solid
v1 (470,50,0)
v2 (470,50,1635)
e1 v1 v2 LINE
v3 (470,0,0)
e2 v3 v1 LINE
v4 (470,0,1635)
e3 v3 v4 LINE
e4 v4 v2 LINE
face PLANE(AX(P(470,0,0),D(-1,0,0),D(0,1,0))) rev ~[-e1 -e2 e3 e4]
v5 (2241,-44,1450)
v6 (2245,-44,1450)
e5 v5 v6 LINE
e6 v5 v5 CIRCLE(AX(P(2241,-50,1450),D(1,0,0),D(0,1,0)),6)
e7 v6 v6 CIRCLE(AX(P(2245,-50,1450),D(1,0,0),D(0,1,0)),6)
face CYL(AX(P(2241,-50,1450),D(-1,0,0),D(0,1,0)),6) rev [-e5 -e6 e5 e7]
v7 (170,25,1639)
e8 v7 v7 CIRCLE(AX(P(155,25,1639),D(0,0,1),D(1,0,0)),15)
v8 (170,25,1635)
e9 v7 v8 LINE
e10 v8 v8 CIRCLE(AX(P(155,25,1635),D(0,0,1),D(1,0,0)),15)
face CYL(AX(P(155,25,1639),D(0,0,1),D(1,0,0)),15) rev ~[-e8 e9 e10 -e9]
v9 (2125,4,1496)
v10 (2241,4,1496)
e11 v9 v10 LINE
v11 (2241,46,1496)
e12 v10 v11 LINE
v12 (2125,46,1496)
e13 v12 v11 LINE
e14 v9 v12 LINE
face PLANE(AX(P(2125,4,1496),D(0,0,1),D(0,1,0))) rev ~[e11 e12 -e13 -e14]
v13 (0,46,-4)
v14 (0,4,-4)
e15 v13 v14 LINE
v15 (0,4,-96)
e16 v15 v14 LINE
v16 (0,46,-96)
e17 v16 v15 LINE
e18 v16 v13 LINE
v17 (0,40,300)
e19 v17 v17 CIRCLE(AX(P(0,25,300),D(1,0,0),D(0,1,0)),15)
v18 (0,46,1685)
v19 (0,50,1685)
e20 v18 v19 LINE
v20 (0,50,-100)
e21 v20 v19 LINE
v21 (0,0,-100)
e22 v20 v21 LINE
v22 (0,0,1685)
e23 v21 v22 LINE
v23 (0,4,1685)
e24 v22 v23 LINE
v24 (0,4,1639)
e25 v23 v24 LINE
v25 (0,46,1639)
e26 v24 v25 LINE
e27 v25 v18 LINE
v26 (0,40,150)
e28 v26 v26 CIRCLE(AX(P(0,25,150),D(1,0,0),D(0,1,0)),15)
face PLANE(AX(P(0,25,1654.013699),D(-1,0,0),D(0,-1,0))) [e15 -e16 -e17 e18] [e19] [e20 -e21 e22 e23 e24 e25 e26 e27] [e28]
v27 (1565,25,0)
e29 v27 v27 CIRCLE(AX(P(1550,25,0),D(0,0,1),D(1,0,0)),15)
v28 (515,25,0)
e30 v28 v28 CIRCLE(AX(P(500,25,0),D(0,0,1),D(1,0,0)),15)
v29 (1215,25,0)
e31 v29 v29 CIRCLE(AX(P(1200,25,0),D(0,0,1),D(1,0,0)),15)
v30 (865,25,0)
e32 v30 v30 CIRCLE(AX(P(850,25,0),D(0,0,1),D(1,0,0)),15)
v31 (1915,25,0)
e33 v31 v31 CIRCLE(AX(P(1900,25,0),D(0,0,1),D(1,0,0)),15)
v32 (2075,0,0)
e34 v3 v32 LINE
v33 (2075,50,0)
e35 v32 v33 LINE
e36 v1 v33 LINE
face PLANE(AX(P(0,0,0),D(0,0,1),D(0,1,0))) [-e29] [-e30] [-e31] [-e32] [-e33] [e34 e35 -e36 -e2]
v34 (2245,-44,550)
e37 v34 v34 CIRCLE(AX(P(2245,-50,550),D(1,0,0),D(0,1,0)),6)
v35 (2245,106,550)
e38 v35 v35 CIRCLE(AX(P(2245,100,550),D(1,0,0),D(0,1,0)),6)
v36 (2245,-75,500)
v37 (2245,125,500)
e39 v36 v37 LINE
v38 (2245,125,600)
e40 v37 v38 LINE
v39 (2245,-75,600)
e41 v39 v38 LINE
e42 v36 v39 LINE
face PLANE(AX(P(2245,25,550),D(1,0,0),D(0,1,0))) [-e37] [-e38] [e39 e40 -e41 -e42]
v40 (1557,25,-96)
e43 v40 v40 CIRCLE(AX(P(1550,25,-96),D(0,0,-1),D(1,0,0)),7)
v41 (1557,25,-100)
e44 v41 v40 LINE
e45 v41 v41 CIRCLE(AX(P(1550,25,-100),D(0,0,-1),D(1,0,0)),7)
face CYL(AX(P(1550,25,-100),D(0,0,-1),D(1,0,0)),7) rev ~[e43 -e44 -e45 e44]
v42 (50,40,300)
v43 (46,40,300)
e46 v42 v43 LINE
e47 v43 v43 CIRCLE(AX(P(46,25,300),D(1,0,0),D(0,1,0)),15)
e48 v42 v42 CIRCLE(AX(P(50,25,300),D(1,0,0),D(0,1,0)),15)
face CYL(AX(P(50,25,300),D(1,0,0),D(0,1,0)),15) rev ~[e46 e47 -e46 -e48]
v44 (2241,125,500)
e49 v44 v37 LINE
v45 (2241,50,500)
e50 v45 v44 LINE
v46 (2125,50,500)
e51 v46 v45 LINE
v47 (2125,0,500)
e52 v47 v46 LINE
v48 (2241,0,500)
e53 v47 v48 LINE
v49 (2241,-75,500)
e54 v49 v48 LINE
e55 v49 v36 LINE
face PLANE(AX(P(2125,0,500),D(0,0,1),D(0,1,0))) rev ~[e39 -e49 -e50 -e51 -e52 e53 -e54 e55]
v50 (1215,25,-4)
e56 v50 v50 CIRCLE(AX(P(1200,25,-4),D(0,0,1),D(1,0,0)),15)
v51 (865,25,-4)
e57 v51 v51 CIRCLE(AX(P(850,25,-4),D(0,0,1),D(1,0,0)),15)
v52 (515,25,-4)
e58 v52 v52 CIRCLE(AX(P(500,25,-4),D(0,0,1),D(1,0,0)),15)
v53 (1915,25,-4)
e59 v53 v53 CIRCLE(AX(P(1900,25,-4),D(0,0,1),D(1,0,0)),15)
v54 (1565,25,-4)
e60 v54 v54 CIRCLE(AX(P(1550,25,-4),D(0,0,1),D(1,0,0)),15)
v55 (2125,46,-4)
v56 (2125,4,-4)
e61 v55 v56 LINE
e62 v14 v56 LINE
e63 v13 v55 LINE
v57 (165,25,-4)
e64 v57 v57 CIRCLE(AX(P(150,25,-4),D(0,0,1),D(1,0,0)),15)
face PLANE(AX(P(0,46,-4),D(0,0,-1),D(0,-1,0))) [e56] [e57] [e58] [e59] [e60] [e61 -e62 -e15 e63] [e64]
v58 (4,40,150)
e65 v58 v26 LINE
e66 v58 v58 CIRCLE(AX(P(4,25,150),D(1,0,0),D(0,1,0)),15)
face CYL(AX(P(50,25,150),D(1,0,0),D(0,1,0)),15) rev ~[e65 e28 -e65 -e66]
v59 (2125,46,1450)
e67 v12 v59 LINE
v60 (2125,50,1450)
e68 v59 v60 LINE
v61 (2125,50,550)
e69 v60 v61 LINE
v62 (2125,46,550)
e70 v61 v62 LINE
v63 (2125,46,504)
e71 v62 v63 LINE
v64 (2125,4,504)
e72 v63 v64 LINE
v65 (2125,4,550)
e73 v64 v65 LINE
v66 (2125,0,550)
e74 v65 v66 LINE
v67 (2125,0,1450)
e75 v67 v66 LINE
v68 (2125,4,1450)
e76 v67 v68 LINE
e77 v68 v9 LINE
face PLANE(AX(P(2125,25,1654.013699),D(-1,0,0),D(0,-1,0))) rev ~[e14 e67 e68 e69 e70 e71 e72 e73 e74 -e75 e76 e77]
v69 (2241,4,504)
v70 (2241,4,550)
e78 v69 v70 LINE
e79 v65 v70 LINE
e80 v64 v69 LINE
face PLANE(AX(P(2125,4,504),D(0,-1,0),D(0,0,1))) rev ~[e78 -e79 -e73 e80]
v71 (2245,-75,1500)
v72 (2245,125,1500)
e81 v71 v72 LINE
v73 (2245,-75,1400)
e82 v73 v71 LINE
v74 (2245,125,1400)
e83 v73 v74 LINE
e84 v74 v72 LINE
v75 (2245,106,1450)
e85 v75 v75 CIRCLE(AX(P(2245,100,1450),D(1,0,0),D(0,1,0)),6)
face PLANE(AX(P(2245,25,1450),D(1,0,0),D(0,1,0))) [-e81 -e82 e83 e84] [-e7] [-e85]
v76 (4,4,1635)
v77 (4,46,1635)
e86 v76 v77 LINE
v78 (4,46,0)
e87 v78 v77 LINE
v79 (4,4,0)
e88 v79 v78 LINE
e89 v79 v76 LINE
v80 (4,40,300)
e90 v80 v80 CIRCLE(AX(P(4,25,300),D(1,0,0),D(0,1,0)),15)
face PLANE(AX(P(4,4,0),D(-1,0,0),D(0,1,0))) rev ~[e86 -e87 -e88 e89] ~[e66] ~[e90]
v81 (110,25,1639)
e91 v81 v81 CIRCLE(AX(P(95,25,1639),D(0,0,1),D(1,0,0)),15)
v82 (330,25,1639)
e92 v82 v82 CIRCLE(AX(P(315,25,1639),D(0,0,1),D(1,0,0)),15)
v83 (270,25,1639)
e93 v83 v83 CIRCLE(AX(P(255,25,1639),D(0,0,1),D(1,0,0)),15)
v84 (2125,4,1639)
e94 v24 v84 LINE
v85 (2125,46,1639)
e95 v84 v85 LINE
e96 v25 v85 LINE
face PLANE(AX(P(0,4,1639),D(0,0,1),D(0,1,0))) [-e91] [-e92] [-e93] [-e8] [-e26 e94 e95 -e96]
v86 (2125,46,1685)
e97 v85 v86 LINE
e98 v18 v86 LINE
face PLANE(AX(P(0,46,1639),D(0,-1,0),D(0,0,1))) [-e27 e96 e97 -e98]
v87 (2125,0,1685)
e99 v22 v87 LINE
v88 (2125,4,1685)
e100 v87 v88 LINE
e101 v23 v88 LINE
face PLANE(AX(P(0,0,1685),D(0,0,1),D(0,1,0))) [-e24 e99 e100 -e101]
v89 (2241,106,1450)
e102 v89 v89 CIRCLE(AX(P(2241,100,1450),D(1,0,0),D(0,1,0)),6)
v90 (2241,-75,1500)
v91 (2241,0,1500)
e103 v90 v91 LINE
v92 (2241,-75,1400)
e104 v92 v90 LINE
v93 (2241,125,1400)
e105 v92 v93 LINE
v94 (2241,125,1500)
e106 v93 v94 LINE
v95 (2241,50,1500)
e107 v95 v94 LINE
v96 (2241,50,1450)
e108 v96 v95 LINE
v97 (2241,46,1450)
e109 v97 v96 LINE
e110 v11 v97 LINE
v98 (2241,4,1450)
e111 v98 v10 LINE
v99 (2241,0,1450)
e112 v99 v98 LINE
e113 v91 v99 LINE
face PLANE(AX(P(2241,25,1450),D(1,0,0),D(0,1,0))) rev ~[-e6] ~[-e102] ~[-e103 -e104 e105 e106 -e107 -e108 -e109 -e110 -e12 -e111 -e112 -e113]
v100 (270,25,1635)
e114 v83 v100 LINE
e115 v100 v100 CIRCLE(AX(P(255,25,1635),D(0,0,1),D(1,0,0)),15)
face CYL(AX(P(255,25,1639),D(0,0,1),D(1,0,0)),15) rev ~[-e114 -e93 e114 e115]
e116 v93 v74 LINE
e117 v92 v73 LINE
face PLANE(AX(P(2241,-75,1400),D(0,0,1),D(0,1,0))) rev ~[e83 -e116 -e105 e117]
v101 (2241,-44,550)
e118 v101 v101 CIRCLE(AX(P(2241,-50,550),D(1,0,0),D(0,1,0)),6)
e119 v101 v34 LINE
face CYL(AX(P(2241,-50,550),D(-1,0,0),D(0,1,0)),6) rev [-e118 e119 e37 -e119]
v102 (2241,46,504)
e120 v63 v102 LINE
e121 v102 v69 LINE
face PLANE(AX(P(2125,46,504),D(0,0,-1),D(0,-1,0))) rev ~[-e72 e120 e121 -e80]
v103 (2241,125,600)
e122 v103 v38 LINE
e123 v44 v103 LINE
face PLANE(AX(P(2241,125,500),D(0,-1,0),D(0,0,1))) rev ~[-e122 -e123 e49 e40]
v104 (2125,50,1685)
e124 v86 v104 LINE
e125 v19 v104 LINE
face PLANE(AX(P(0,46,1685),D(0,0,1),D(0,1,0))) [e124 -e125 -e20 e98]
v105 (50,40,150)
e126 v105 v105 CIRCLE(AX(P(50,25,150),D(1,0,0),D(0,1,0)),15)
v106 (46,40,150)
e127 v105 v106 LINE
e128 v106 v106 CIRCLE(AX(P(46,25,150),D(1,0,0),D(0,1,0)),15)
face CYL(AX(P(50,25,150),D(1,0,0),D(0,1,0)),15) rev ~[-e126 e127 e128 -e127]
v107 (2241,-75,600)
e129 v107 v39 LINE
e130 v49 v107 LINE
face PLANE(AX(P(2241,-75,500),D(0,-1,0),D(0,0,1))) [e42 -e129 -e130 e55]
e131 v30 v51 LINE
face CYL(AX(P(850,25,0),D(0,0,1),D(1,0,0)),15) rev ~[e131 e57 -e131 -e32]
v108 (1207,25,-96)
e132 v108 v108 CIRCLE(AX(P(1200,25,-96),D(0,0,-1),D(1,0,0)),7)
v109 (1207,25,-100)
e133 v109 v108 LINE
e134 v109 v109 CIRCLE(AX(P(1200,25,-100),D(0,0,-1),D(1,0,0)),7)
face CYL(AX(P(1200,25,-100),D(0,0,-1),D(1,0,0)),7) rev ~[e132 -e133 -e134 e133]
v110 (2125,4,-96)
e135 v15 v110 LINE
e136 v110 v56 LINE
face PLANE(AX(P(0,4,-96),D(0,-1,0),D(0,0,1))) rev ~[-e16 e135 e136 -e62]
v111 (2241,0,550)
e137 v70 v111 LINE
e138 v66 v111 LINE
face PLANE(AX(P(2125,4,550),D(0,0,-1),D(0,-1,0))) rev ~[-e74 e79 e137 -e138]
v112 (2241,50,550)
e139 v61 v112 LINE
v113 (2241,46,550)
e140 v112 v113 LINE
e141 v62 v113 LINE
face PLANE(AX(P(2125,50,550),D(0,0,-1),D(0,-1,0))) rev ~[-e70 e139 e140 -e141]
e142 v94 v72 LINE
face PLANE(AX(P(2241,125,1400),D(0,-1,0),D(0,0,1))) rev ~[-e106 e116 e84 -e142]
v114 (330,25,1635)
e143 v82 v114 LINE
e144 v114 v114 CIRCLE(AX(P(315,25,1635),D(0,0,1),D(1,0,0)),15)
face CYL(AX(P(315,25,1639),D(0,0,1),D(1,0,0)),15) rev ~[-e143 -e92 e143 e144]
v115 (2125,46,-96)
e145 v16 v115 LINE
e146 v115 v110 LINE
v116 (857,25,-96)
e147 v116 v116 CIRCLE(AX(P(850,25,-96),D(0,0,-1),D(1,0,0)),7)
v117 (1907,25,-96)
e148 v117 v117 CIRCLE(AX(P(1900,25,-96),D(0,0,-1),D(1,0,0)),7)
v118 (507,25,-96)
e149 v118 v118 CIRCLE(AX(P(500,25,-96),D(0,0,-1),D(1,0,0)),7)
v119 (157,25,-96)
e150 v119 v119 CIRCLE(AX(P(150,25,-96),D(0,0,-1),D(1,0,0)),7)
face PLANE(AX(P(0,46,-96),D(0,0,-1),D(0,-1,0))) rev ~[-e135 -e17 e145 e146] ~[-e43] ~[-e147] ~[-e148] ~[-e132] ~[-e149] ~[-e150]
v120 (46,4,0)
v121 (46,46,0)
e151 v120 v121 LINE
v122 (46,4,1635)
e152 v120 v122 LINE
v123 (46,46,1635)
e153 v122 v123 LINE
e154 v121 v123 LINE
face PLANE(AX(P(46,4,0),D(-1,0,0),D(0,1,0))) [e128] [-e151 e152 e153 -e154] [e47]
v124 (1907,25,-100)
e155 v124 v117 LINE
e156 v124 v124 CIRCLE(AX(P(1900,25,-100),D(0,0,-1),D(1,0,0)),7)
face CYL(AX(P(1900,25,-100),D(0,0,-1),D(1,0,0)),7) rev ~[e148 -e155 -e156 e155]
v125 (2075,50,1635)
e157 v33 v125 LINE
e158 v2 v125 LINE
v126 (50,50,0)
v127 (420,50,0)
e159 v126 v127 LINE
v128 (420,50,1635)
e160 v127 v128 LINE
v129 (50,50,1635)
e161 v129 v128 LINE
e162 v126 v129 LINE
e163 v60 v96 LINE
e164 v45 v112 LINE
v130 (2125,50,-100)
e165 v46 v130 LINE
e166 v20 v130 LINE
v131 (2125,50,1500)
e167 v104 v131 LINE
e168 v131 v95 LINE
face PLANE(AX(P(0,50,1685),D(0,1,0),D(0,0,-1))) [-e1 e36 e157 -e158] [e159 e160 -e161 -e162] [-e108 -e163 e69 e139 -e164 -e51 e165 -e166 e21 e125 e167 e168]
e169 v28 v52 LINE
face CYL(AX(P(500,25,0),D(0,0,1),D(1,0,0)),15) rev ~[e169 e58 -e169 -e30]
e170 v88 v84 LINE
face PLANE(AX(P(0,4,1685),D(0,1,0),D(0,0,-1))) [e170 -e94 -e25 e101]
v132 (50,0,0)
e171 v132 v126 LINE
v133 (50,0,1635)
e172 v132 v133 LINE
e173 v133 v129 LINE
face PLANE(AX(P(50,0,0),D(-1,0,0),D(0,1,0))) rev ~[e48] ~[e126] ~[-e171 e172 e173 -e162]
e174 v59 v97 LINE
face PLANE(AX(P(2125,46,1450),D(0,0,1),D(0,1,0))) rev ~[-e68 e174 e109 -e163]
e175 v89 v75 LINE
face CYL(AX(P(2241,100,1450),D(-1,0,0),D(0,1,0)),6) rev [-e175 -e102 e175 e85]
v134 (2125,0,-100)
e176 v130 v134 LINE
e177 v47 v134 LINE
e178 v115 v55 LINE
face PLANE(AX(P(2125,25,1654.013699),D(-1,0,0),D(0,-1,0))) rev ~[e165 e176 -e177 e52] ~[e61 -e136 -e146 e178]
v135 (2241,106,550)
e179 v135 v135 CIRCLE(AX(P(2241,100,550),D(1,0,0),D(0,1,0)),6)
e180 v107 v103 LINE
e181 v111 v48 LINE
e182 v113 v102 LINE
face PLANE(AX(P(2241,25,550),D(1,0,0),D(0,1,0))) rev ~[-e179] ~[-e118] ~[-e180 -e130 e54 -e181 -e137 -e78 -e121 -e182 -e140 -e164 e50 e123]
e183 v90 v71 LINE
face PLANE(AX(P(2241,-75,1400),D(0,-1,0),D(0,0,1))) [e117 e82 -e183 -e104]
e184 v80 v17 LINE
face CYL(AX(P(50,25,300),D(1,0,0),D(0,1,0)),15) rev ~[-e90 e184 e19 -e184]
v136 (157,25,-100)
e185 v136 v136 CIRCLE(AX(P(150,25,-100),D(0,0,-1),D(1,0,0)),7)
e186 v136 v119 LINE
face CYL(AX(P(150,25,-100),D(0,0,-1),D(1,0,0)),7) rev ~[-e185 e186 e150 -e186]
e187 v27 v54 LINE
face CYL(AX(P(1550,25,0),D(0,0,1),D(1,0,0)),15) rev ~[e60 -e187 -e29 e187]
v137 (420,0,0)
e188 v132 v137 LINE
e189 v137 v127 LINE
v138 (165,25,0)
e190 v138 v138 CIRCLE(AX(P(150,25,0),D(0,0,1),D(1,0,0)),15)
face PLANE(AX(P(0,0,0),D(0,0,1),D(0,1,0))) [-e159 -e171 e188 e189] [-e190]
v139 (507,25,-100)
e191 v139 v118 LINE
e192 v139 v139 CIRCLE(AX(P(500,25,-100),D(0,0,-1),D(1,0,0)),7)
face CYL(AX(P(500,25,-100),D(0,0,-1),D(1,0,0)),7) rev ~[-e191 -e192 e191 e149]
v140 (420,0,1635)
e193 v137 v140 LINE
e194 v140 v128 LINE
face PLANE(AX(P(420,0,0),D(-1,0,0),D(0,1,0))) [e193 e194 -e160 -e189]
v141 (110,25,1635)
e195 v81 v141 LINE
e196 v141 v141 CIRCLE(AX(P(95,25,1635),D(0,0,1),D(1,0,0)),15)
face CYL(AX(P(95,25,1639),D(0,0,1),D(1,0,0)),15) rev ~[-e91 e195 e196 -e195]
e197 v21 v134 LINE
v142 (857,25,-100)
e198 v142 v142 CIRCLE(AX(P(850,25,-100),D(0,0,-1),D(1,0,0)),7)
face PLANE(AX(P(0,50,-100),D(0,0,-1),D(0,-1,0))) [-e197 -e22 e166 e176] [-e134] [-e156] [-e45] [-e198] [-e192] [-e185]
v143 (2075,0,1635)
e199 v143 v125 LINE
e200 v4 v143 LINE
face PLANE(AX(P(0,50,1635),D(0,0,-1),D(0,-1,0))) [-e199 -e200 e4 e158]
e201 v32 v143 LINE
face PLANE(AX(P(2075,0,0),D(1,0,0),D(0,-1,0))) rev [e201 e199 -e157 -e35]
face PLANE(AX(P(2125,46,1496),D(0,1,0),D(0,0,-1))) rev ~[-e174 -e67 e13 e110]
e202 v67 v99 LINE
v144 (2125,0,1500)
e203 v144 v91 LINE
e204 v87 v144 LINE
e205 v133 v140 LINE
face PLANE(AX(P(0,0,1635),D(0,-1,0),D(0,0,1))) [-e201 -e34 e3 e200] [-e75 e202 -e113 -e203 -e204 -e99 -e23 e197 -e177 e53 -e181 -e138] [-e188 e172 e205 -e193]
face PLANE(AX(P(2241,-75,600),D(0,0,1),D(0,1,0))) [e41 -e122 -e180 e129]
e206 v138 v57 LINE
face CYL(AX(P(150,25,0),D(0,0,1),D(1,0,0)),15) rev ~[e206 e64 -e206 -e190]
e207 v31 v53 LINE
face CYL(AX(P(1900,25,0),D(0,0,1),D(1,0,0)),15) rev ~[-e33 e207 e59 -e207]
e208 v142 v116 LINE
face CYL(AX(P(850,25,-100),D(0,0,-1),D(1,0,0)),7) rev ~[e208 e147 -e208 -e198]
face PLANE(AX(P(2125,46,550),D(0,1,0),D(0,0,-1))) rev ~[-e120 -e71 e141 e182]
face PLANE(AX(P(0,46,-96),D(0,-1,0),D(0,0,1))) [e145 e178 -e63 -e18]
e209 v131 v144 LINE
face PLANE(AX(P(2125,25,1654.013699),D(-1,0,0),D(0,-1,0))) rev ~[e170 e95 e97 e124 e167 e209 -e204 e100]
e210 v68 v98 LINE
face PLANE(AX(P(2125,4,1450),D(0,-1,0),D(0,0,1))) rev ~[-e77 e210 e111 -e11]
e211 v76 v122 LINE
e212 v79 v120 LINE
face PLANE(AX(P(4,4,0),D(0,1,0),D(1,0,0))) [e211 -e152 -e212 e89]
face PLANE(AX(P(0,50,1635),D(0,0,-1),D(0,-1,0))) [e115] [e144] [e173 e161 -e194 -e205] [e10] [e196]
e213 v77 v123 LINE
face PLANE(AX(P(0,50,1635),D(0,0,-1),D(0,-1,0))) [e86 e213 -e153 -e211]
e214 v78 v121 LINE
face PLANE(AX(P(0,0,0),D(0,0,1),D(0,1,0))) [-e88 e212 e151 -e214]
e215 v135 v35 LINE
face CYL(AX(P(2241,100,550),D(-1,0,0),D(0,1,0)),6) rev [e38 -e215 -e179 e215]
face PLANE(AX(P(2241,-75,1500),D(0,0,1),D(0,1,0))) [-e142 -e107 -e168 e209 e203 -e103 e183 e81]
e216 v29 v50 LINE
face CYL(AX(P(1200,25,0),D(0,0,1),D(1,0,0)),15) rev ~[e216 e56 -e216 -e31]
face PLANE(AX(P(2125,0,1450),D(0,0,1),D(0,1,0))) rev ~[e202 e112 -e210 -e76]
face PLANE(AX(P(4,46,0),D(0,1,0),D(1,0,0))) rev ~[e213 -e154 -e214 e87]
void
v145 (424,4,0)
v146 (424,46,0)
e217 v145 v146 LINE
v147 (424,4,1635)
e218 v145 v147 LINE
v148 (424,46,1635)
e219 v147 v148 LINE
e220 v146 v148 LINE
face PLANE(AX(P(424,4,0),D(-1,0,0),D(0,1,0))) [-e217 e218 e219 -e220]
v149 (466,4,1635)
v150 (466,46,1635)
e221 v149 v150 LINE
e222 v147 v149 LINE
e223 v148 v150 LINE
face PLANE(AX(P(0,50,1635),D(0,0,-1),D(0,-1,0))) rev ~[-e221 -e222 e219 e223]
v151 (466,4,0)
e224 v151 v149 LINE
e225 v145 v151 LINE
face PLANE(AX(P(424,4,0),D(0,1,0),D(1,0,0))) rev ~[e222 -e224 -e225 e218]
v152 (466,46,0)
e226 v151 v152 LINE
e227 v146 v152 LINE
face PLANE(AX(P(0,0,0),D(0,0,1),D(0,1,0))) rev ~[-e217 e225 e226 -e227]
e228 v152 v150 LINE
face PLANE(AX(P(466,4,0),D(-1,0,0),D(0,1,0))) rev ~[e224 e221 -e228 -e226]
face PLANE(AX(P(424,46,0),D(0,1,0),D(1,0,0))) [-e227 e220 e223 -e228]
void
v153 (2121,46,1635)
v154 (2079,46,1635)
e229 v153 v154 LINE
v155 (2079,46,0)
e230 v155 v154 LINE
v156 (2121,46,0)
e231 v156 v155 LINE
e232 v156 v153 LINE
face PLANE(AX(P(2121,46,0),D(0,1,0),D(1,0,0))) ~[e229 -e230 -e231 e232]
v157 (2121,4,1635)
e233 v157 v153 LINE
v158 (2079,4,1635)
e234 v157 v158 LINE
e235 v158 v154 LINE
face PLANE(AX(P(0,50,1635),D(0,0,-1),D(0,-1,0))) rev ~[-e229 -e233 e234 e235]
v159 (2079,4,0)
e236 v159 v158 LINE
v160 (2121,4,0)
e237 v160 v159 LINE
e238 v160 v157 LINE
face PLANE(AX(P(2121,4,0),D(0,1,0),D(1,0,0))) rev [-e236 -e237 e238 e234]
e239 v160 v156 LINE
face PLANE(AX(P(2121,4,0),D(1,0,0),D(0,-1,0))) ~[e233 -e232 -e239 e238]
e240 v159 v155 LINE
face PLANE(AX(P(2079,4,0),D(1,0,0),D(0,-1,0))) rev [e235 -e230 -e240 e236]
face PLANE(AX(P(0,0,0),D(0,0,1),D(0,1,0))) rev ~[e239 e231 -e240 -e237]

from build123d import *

# Parameters (mm, degrees)
F0_W      = 42
F0_H      = 42
F1_DEPTH  = 1635
F2_W      = 42
F2_H      = 92
F3_DEPTH  = 2125
F7_DEPTH  = 2125
F8_R      = 15
F9_DEPTH  = 50
F10_R     = 15
F11_DEPTH = 250
F13_DEPTH = 116
F14_W     = 200
F14_H     = 100
F14_R     = 6
F15_DEPTH = 4
F16_W     = 50
F16_H     = 50
F16_W_2   = 42
F16_H_2   = 42
F17_DEPTH = 1635
F18_R     = 7
F19_DEPTH = 125
F20_R     = 15
F20_R_2   = 7
F21_DEPTH = 5


# Not quite as in the source:
# - a feature names something its author has since deleted; it is built from what else it names


with BuildPart() as f1:
    # F0 (on Top) → F1 (new body)
    with BuildSketch(Plane.XY):
        Polygon((0, 4), (0, 0), (50, 0), (50, 50), (0, 50), (0, 46), align=None)
        with Locations((25, 25)):
            Rectangle(F0_W, F0_H, mode=Mode.SUBTRACT)
    extrude(amount=F1_DEPTH)


with BuildPart() as f3:
    # F2 (on face) → F3 (new body)
    with BuildSketch(Plane(origin=(0, 0, 0), x_dir=(0, -1, 0), z_dir=(-1, 0, 0))):
        Polygon((0, 0), (-50, 0), (-50, -4), (-50, -96), (-50, -100), (0, -100), align=None)
        with Locations((-25, -50)):
            Rectangle(F2_W, F2_H, mode=Mode.SUBTRACT)
    extrude(amount=-F3_DEPTH)

    # F5: F1 across plane
    add(f1.part.mirror(Plane.YZ.offset(1062.5)))


with BuildPart() as f1_1:
    add(f1.part)

    add(f3.part)  # F7 merges F3
    # F6 (on face) → F7 (join, through all)
    with BuildSketch(Plane(origin=(0, 0, 0), x_dir=(0, -1, 0), z_dir=(-1, 0, 0))):
        Polygon((-46, 1685), (-50, 1685), (-50, 1635), (0, 1635), (0, 1685), (-4, 1685), (-4, 1639), (-46, 1639), align=None)
    extrude(amount=-F7_DEPTH)

    # F8 (on face) → F9 (cut)
    with BuildSketch(Plane.XY.offset(1639)):
        with Locations((315, 25)):
            Circle(F8_R)
        with Locations((155, 25)):
            Circle(F8_R)
        with Locations((255, 25)):
            Circle(F8_R)
        with Locations((95, 25)):
            Circle(F8_R)
    extrude(amount=-F9_DEPTH, mode=Mode.SUBTRACT)

    # F10 (on face) → F11 (cut)
    with BuildSketch(Plane.YZ.offset(50)):
        with Locations((25, 300)):
            Circle(F10_R)
        with Locations((25, 150)):
            Circle(F10_R)
    extrude(amount=-F11_DEPTH, mode=Mode.SUBTRACT)

    # F12 (on face) → F13 (join)
    with BuildSketch(Plane.YZ.offset(2125)):
        Polygon((4, 550), (0, 550), (0, 500), (50, 500), (50, 550), (46, 550), (46, 504), (4, 504), align=None)
        Polygon((0, 1500), (0, 1450), (4, 1450), (4, 1496), (46, 1496), (46, 1450), (50, 1450), (50, 1500), align=None)
    extrude(amount=F13_DEPTH)

    # F14 (on face) → F15 (join)
    with BuildSketch(Plane.YZ.offset(2241)):
        with Locations((25, 1450)):
            Rectangle(F14_W, F14_H)
        with Locations((-50, 1450)):
            Circle(F14_R, mode=Mode.SUBTRACT)
        with Locations((100, 1450)):
            Circle(F14_R, mode=Mode.SUBTRACT)
        with Locations((25, 550)):
            Rectangle(F14_W, F14_H)
        with Locations((-50, 550)):
            Circle(F14_R, mode=Mode.SUBTRACT)
        with Locations((100, 550)):
            Circle(F14_R, mode=Mode.SUBTRACT)
    extrude(amount=F15_DEPTH)

    # F16 (on face) → F17 (join, through all)
    with BuildSketch(Plane.XY):
        with Locations((445, 25)):
            Rectangle(F16_W, F16_H)
        with Locations((445, 25)):
            Rectangle(F16_W_2, F16_H_2, mode=Mode.SUBTRACT)
    extrude(amount=F17_DEPTH)

    # F18 (on face) → F19 (cut)
    with BuildSketch(Plane(origin=(0, 0, -100), x_dir=(1, 0, 0), z_dir=(0, 0, -1))):
        with Locations((150, -25)):
            Circle(F18_R)
        with Locations((500, -25)):
            Circle(F18_R)
        with Locations((850, -25)):
            Circle(F18_R)
        with Locations((1200, -25)):
            Circle(F18_R)
        with Locations((1550, -25)):
            Circle(F18_R)
        with Locations((1900, -25)):
            Circle(F18_R)
    extrude(amount=-F19_DEPTH, mode=Mode.SUBTRACT)

    # F20 (on face) → F21 (cut)
    with BuildSketch(Plane.XY):
        with Locations((500, 25)):
            Circle(F20_R)
        with Locations((500, 25)):
            Circle(F20_R_2, mode=Mode.SUBTRACT)
        with Locations((850, 25)):
            Circle(F20_R)
        with Locations((850, 25)):
            Circle(F20_R_2, mode=Mode.SUBTRACT)
        with Locations((1200, 25)):
            Circle(F20_R)
        with Locations((1200, 25)):
            Circle(F20_R_2, mode=Mode.SUBTRACT)
        with Locations((1550, 25)):
            Circle(F20_R)
        with Locations((1550, 25)):
            Circle(F20_R_2, mode=Mode.SUBTRACT)
        with Locations((1900, 25)):
            Circle(F20_R)
        with Locations((1900, 25)):
            Circle(F20_R_2, mode=Mode.SUBTRACT)
        with Locations((150, 25)):
            Circle(F20_R)
    extrude(amount=-F21_DEPTH, mode=Mode.SUBTRACT)


solid = f1_1.part
